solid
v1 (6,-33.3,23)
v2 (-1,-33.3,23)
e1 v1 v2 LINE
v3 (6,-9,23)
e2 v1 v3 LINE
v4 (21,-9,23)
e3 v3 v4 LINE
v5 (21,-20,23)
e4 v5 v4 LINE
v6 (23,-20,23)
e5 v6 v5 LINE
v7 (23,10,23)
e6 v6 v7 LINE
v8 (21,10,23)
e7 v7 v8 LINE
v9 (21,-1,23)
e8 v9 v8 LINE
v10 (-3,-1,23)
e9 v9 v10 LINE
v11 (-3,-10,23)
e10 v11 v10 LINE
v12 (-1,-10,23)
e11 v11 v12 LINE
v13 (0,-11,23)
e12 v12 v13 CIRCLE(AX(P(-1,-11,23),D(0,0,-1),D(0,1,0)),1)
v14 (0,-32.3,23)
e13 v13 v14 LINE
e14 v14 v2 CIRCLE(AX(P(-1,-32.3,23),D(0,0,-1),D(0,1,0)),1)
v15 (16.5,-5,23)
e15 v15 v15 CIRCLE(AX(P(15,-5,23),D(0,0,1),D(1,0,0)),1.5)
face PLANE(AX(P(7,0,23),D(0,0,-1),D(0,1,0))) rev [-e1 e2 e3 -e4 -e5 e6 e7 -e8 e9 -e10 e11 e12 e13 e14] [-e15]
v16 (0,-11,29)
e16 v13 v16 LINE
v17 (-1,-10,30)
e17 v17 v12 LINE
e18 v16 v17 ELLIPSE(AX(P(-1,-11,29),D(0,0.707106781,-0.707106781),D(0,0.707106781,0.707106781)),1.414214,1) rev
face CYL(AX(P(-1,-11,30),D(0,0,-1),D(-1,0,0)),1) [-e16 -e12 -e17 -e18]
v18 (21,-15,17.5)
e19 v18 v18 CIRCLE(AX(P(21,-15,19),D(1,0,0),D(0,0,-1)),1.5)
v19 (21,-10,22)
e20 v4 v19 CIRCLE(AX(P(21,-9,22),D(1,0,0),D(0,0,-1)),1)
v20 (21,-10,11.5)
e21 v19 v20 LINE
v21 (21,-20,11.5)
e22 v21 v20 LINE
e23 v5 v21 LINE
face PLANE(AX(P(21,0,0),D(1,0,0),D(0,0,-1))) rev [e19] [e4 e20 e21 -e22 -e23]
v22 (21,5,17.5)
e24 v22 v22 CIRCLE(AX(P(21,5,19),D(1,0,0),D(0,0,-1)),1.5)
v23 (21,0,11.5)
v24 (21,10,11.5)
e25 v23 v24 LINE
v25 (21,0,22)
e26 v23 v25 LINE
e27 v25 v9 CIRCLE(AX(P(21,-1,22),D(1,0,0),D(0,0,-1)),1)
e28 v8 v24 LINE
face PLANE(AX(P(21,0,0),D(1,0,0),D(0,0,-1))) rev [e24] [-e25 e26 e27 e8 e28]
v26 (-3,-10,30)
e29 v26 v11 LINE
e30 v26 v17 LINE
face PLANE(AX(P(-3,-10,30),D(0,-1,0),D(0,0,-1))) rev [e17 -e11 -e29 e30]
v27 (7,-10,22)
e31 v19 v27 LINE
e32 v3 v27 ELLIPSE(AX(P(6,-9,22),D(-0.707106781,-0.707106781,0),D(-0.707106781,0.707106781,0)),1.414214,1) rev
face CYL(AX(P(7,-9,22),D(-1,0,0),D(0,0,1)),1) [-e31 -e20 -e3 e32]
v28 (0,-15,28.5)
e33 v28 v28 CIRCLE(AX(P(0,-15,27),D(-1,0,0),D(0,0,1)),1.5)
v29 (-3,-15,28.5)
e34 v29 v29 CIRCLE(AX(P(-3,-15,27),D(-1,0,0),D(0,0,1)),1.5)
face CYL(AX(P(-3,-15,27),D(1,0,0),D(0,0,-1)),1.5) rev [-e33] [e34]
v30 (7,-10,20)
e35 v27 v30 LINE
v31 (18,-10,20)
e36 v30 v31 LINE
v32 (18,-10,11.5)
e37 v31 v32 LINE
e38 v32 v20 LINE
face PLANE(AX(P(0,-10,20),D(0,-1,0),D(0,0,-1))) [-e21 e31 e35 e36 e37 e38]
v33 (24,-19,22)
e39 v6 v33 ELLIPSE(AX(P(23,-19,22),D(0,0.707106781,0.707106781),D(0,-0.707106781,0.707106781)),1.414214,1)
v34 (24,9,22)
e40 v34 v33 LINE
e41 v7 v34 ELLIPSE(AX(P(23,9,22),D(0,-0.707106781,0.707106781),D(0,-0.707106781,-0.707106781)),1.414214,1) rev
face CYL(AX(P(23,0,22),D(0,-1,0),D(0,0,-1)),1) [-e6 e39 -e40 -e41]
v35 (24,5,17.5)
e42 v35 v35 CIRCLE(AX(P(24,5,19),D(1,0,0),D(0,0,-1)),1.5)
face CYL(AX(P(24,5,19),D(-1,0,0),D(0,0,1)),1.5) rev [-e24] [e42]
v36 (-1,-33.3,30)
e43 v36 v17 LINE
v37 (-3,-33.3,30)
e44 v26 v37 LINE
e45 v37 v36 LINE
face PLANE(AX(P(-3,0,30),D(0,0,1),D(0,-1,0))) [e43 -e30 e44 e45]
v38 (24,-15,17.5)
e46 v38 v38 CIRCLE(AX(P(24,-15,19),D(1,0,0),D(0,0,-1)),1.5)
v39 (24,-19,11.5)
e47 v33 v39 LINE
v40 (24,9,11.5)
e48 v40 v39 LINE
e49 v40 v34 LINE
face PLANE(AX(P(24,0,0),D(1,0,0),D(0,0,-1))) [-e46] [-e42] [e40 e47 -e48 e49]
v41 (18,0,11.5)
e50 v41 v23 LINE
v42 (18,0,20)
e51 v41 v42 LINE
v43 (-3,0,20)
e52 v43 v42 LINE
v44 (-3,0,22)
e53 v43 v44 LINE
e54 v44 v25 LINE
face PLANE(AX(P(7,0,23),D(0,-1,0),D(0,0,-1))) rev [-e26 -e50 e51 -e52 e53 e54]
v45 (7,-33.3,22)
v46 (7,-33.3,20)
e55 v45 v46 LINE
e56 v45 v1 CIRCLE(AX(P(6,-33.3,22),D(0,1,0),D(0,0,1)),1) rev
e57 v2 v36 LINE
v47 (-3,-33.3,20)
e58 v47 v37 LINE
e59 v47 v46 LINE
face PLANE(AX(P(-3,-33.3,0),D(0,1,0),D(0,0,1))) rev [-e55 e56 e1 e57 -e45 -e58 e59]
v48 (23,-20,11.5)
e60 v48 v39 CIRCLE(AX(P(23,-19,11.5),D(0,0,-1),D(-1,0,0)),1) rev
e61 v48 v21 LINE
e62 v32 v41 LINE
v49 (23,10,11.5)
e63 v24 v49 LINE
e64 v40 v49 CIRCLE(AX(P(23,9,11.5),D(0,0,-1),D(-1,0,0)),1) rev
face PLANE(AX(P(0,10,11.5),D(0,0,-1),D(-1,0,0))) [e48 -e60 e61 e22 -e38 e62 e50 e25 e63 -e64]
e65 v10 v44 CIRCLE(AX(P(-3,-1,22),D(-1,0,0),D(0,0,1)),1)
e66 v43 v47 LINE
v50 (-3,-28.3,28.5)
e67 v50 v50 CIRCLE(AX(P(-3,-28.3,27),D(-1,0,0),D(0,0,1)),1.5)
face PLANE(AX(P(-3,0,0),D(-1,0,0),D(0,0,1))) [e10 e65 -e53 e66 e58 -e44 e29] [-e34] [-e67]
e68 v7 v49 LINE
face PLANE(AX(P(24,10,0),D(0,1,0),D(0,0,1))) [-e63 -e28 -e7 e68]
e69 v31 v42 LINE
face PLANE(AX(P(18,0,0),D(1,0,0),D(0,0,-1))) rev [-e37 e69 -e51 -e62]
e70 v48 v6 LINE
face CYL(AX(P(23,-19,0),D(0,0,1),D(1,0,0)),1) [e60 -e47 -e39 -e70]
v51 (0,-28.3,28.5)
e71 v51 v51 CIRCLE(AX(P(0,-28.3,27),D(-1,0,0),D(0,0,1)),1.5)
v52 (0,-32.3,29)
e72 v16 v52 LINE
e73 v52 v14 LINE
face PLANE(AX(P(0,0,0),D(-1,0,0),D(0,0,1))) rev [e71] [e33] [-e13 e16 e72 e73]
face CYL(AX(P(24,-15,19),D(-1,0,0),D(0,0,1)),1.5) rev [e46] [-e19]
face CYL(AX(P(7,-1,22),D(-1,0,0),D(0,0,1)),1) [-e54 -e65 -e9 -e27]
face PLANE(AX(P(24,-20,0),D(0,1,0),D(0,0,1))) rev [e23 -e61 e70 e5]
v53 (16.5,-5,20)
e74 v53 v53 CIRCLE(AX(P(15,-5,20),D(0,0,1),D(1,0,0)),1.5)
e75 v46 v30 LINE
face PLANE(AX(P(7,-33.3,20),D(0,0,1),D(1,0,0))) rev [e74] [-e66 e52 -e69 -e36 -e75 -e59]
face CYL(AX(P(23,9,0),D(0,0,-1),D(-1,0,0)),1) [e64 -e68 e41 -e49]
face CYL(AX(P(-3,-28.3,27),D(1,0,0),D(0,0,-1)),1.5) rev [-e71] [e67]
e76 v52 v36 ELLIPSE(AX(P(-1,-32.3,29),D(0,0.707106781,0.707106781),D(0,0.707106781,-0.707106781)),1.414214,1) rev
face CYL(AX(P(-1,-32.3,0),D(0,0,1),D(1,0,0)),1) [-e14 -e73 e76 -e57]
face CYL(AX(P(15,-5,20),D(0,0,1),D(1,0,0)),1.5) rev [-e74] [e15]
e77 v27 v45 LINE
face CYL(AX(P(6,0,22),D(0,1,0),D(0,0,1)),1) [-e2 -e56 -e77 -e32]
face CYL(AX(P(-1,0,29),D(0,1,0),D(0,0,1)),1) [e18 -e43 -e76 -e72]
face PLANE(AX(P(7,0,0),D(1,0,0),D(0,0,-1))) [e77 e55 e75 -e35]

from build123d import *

# Parameters (mm, degrees)
CROQUIS1_W              = 23
CROQUIS1_H              = 33.3
SALIENTE_EXTRUIR2_DEPTH = 7
CROQUIS3_W              = 4
CROQUIS3_H              = 19
CORTAR_EXTRUIR1_DEPTH   = 42.071766458
CROQUIS7_R              = 1.5
SALIENTE_EXTRUIR3_DEPTH = 3
CROQUIS8_W              = 18
CROQUIS8_H              = 10
CROQUIS8_R              = 1.5
SALIENTE_EXTRUIR5_DEPTH = 3
SALIENTE_EXTRUIR6_START = -1
CROQUIS9_W              = 18
CROQUIS9_H              = 10
CROQUIS9_R              = 1.5
SALIENTE_EXTRUIR6_DEPTH = 1
CROQUIS10_W             = 23
CROQUIS10_H             = 10
SALIENTE_EXTRUIR7_DEPTH = 3
CROQUIS11_W             = 19
CROQUIS11_H             = 38
CORTAR_EXTRUIR5_DEPTH   = 57.449003534
CROQUIS15_W             = 7
CROQUIS15_H             = 10
CORTAR_EXTRUIR8_DEPTH   = 58.475994989
CROQUIS16_W             = 7
CROQUIS16_H             = 16
CORTAR_EXTRUIR9_DEPTH   = 1
CROQUIS18_W             = 23
CROQUIS18_H             = 10
CROQUIS18_R             = 1.5
SALIENTE_EXTRUIR8_DEPTH = 3
REDONDEO1_R             = 1
CROQUIS19_W             = 2
CROQUIS19_H             = 11.5
CORTAR_EXTRUIR10_DEPTH  = 67.516839973
CROQUIS20_W             = 11.5
CROQUIS20_H             = 11
CORTAR_EXTRUIR11_DEPTH  = 60.929041374


with BuildPart() as part:
    # Croquis1 → Saliente-Extruir2 (new body)
    with BuildSketch(Plane(origin=(0, 0, 0), x_dir=(0, 0, -1), z_dir=(1, 0, 0))):
        with Locations((-11.5, -16.65)):
            Rectangle(CROQUIS1_W, CROQUIS1_H)
    extrude(amount=SALIENTE_EXTRUIR2_DEPTH)

    # Croquis3 → Cortar-Extruir1 (cut, through all)
    with BuildSketch(Plane(origin=(0, 0, 0), x_dir=(1, 0, 0), z_dir=(0, 1, 0))):
        with Locations((5, -10.5)):
            Rectangle(CROQUIS3_W, CROQUIS3_H)
    extrude(amount=-CORTAR_EXTRUIR1_DEPTH, mode=Mode.SUBTRACT)



with BuildPart() as body_2:
    # Croquis7 → Saliente-Extruir3 (new body)
    with BuildSketch(Plane.ZY):
        Polygon((-7, 0), (-7, -33.3), (0, -33.3), (0, -44.3), (23, -44.3), (23, -33.3), (30, -33.3), (30, 0), align=None)
        with Locations((-4, -28.3)):
            Circle(CROQUIS7_R, mode=Mode.SUBTRACT)
        with Locations((-4, -15)):
            Circle(CROQUIS7_R, mode=Mode.SUBTRACT)
        with Locations((27, -15)):
            Circle(CROQUIS7_R, mode=Mode.SUBTRACT)
        with Locations((27, -28.3)):
            Circle(CROQUIS7_R, mode=Mode.SUBTRACT)
        with Locations((19, -40.3)):
            Circle(CROQUIS7_R, mode=Mode.SUBTRACT)
        with Locations((4, -40.3)):
            Circle(CROQUIS7_R, mode=Mode.SUBTRACT)
    extrude(amount=SALIENTE_EXTRUIR3_DEPTH)


with BuildPart() as part_1:
    add(part.part)

    add(body_2.part)  # Saliente-Extruir5 merges body 2
    # Croquis8 → Saliente-Extruir5 (add)
    with BuildSketch(Plane.XY.offset(23)):
        with Locations((9, -5)):
            Rectangle(CROQUIS8_W, CROQUIS8_H)
        with Locations((15, -5)):
            Circle(CROQUIS8_R, mode=Mode.SUBTRACT)
        with Locations((3, -5)):
            Circle(CROQUIS8_R, mode=Mode.SUBTRACT)
    extrude(amount=-SALIENTE_EXTRUIR5_DEPTH)

    # Croquis9 → Saliente-Extruir6 (add)
    with BuildSketch(Plane(origin=(0, 0, 0), x_dir=(-1, 0, 0), z_dir=(0, 0, -1)).offset(SALIENTE_EXTRUIR6_START)):
        with Locations((-9, -5)):
            Rectangle(CROQUIS9_W, CROQUIS9_H)
        with Locations(Location((-15, -5, 0), (0, 0, 180))):
            Circle(CROQUIS9_R, mode=Mode.SUBTRACT)
    extrude(amount=SALIENTE_EXTRUIR6_DEPTH)

    # Croquis10 → Saliente-Extruir7 (add)
    with BuildSketch(Plane(origin=(18, 0, 0), x_dir=(0, 0, -1), z_dir=(1, 0, 0))):
        with Locations((-11.5, -5)):
            Rectangle(CROQUIS10_W, CROQUIS10_H)
    extrude(amount=SALIENTE_EXTRUIR7_DEPTH)

    # Croquis11 → Cortar-Extruir5 (cut, through all)
    with BuildSketch(Plane(origin=(3, 0, 0), x_dir=(0, 0, -1), z_dir=(1, 0, 0))):
        with Locations((-10.5, -19)):
            Rectangle(CROQUIS11_W, CROQUIS11_H)
    extrude(amount=-CORTAR_EXTRUIR5_DEPTH, mode=Mode.SUBTRACT)

    # Croquis15 → Cortar-Extruir8 (cut, through all)
    with BuildSketch(Plane(origin=(0, 0, 0), x_dir=(0, 0, -1), z_dir=(1, 0, 0))):
        with Locations((-26.5, -5)):
            Rectangle(CROQUIS15_W, CROQUIS15_H)
        with Locations((3.5, -5)):
            Rectangle(CROQUIS15_W, CROQUIS15_H)
    extrude(amount=-CORTAR_EXTRUIR8_DEPTH, mode=Mode.SUBTRACT)

    # Croquis16 → Cortar-Extruir9 (cut)
    with BuildSketch(Plane(origin=(0, 0, 0), x_dir=(-1, 0, 0), z_dir=(0, 0, -1))):
        with Locations((-3.5, -25.3)):
            Rectangle(CROQUIS16_W, CROQUIS16_H)
    extrude(amount=-CORTAR_EXTRUIR9_DEPTH, mode=Mode.SUBTRACT)

    # Croquis18 → Saliente-Extruir8 (add)
    # profile 1 of 3: a face of its own
    with BuildSketch(Plane(origin=(21, 0, 0), x_dir=(0, 0, -1), z_dir=(1, 0, 0))):
        with Locations((-11.5, 5)):
            Rectangle(CROQUIS18_W, CROQUIS18_H)
        with Locations((-19, 5)):
            Circle(CROQUIS18_R, mode=Mode.SUBTRACT)
        with Locations((-4, 5)):
            Circle(CROQUIS18_R, mode=Mode.SUBTRACT)
    # profile 2 of 3: a face of its own
    with BuildSketch(Plane(origin=(21, 0, 0), x_dir=(0, 0, -1), z_dir=(1, 0, 0))):
        with Locations((-11.5, -5)):
            Rectangle(CROQUIS18_W, CROQUIS18_H)
    # profile 3 of 3: a face of its own
    with BuildSketch(Plane(origin=(21, 0, 0), x_dir=(0, 0, -1), z_dir=(1, 0, 0))):
        with Locations((-11.5, -15)):
            Rectangle(CROQUIS18_W, CROQUIS18_H)
        with Locations((-4, -15)):
            Circle(CROQUIS18_R, mode=Mode.SUBTRACT)
        with Locations((-19, -15)):
            Circle(CROQUIS18_R, mode=Mode.SUBTRACT)
    extrude(amount=SALIENTE_EXTRUIR8_DEPTH)

    # Redondeo1
    # the kernel refuses this fillet: 1 mm, written as the material it takes off along each edge
    with BuildSketch(Plane(origin=(0, -33.3, 30), x_dir=(-1, 0, 0), z_dir=(0, 1, 0)), Plane(origin=(7, -33.3, 23), x_dir=(-1, 0, 0), z_dir=(0, 1, 0))) as redondeo1_piece_1:
        with BuildLine():
            CenterArc((REDONDEO1_R, -REDONDEO1_R), REDONDEO1_R, 90, 90)
            Line((0, -REDONDEO1_R), (-REDONDEO1_R * 0.02, -REDONDEO1_R))
            Line((-REDONDEO1_R * 0.02, -REDONDEO1_R), (-REDONDEO1_R * 0.02, REDONDEO1_R * 0.02))
            Line((-REDONDEO1_R * 0.02, REDONDEO1_R * 0.02), (REDONDEO1_R, REDONDEO1_R * 0.02))
            Line((REDONDEO1_R, REDONDEO1_R * 0.02), (REDONDEO1_R, 0))
        make_face()
    extrude(amount=23.3, mode=Mode.SUBTRACT)
    with BuildSketch(Plane(origin=(0, -10, 23), x_dir=(-1, 0, 0), z_dir=(0, 0, 1)), Plane(origin=(0, -10, -7), x_dir=(-1, 0, 0), z_dir=(0, 0, 1)), Plane(origin=(0, -33.3, -7), x_dir=(0, 1, 0), z_dir=(0, 0, 1))) as redondeo1_piece_2:
        with BuildLine():
            CenterArc((REDONDEO1_R, REDONDEO1_R), REDONDEO1_R, 180, 90)
            Line((0, REDONDEO1_R), (-REDONDEO1_R * 0.02, REDONDEO1_R))
            Line((-REDONDEO1_R * 0.02, REDONDEO1_R), (-REDONDEO1_R * 0.02, -REDONDEO1_R * 0.02))
            Line((-REDONDEO1_R * 0.02, -REDONDEO1_R * 0.02), (REDONDEO1_R, -REDONDEO1_R * 0.02))
            Line((REDONDEO1_R, -REDONDEO1_R * 0.02), (REDONDEO1_R, 0))
        make_face()
    extrude(amount=7, mode=Mode.SUBTRACT)
    with BuildSketch(Plane(origin=(24, 10, 23), x_dir=(0, 0, -1), z_dir=(0, -1, 0)), Plane(origin=(24, 10, 0), x_dir=(-1, 0, 0), z_dir=(0, -1, 0))) as redondeo1_piece_3:
        with BuildLine():
            CenterArc((REDONDEO1_R, -REDONDEO1_R), REDONDEO1_R, 90, 90)
            Line((0, -REDONDEO1_R), (-REDONDEO1_R * 0.02, -REDONDEO1_R))
            Line((-REDONDEO1_R * 0.02, -REDONDEO1_R), (-REDONDEO1_R * 0.02, REDONDEO1_R * 0.02))
            Line((-REDONDEO1_R * 0.02, REDONDEO1_R * 0.02), (REDONDEO1_R, REDONDEO1_R * 0.02))
            Line((REDONDEO1_R, REDONDEO1_R * 0.02), (REDONDEO1_R, 0))
        make_face()
    extrude(amount=30, mode=Mode.SUBTRACT)
    with BuildSketch(Plane(origin=(24, 10, 0), x_dir=(-1, 0, 0), z_dir=(0, 0, 1)), Plane(origin=(0, -44.3, 0), x_dir=(0, 1, 0), z_dir=(0, 0, 1))) as redondeo1_piece_4:
        with BuildLine():
            CenterArc((REDONDEO1_R, REDONDEO1_R), REDONDEO1_R, 180, 90)
            Line((0, REDONDEO1_R), (-REDONDEO1_R * 0.02, REDONDEO1_R))
            Line((-REDONDEO1_R * 0.02, REDONDEO1_R), (-REDONDEO1_R * 0.02, -REDONDEO1_R * 0.02))
            Line((-REDONDEO1_R * 0.02, -REDONDEO1_R * 0.02), (REDONDEO1_R, -REDONDEO1_R * 0.02))
            Line((REDONDEO1_R, -REDONDEO1_R * 0.02), (REDONDEO1_R, 0))
        make_face()
    extrude(amount=23, mode=Mode.SUBTRACT)
    with BuildSketch(Plane(origin=(24, -20, 0), x_dir=(-1, 0, 0), z_dir=(0, 0, 1))) as redondeo1_piece_5:
        with BuildLine():
            CenterArc((REDONDEO1_R, -REDONDEO1_R), REDONDEO1_R, 90, 90)
            Line((0, -REDONDEO1_R), (-REDONDEO1_R * 0.02, -REDONDEO1_R))
            Line((-REDONDEO1_R * 0.02, -REDONDEO1_R), (-REDONDEO1_R * 0.02, REDONDEO1_R * 0.02))
            Line((-REDONDEO1_R * 0.02, REDONDEO1_R * 0.02), (REDONDEO1_R, REDONDEO1_R * 0.02))
            Line((REDONDEO1_R, REDONDEO1_R * 0.02), (REDONDEO1_R, 0))
        make_face()
    extrude(amount=23, mode=Mode.SUBTRACT)
    with BuildSketch(Plane(origin=(7, -10, 23), x_dir=(0, 1, 0), z_dir=(1, 0, 0))) as redondeo1_piece_6:
        with BuildLine():
            CenterArc((REDONDEO1_R, -REDONDEO1_R), REDONDEO1_R, 90, 90)
            Line((0, -REDONDEO1_R), (-REDONDEO1_R * 0.02, -REDONDEO1_R))
            Line((-REDONDEO1_R * 0.02, -REDONDEO1_R), (-REDONDEO1_R * 0.02, REDONDEO1_R * 0.02))
            Line((-REDONDEO1_R * 0.02, REDONDEO1_R * 0.02), (REDONDEO1_R, REDONDEO1_R * 0.02))
            Line((REDONDEO1_R, REDONDEO1_R * 0.02), (REDONDEO1_R, 0))
        make_face()
    extrude(amount=14, mode=Mode.SUBTRACT)
    with BuildSketch(Plane(origin=(0, -33.3, 0), x_dir=(0, 0, 1), z_dir=(0, -1, 0))) as redondeo1_piece_7:
        with BuildLine():
            CenterArc((REDONDEO1_R, REDONDEO1_R), REDONDEO1_R, 180, 90)
            Line((0, REDONDEO1_R), (-REDONDEO1_R * 0.02, REDONDEO1_R))
            Line((-REDONDEO1_R * 0.02, REDONDEO1_R), (-REDONDEO1_R * 0.02, -REDONDEO1_R * 0.02))
            Line((-REDONDEO1_R * 0.02, -REDONDEO1_R * 0.02), (REDONDEO1_R, -REDONDEO1_R * 0.02))
            Line((REDONDEO1_R, -REDONDEO1_R * 0.02), (REDONDEO1_R, 0))
        make_face()
    extrude(amount=11, mode=Mode.SUBTRACT)
    with BuildSketch(Plane(origin=(0, -33.3, 23), x_dir=(-1, 0, 0), z_dir=(0, 0, 1))) as redondeo1_piece_8:
        with BuildLine():
            CenterArc((REDONDEO1_R, -REDONDEO1_R), REDONDEO1_R, 90, 90)
            Line((0, -REDONDEO1_R), (-REDONDEO1_R * 0.02, -REDONDEO1_R))
            Line((-REDONDEO1_R * 0.02, -REDONDEO1_R), (-REDONDEO1_R * 0.02, REDONDEO1_R * 0.02))
            Line((-REDONDEO1_R * 0.02, REDONDEO1_R * 0.02), (REDONDEO1_R, REDONDEO1_R * 0.02))
            Line((REDONDEO1_R, REDONDEO1_R * 0.02), (REDONDEO1_R, 0))
        make_face()
    extrude(amount=7, mode=Mode.SUBTRACT)
    with BuildSketch(Plane(origin=(-3, 0, 23), x_dir=(0, -1, 0), z_dir=(1, 0, 0)), Plane(origin=(21, 0, 0), x_dir=(0, -1, 0), z_dir=(-1, 0, 0))) as redondeo1_piece_9:
        with BuildLine():
            CenterArc((REDONDEO1_R, REDONDEO1_R), REDONDEO1_R, 180, 90)
            Line((0, REDONDEO1_R), (-REDONDEO1_R * 0.02, REDONDEO1_R))
            Line((-REDONDEO1_R * 0.02, REDONDEO1_R), (-REDONDEO1_R * 0.02, -REDONDEO1_R * 0.02))
            Line((-REDONDEO1_R * 0.02, -REDONDEO1_R * 0.02), (REDONDEO1_R, -REDONDEO1_R * 0.02))
            Line((REDONDEO1_R, -REDONDEO1_R * 0.02), (REDONDEO1_R, 0))
        make_face()
    extrude(amount=24, mode=Mode.SUBTRACT)
    with BuildSketch(Plane(origin=(0, -10, -7), x_dir=(0, 0, 1), z_dir=(0, -1, 0))) as redondeo1_piece_10:
        with BuildLine():
            CenterArc((REDONDEO1_R, REDONDEO1_R), REDONDEO1_R, 180, 90)
            Line((0, REDONDEO1_R), (-REDONDEO1_R * 0.02, REDONDEO1_R))
            Line((-REDONDEO1_R * 0.02, REDONDEO1_R), (-REDONDEO1_R * 0.02, -REDONDEO1_R * 0.02))
            Line((-REDONDEO1_R * 0.02, -REDONDEO1_R * 0.02), (REDONDEO1_R, -REDONDEO1_R * 0.02))
            Line((REDONDEO1_R, -REDONDEO1_R * 0.02), (REDONDEO1_R, 0))
        make_face()
    extrude(amount=23.3, mode=Mode.SUBTRACT)
    with BuildSketch(Plane(origin=(0, -33.3, 23), x_dir=(-1, 0, 0), z_dir=(0, 0, 1))) as redondeo1_piece_11a_section:
        with BuildLine():
            CenterArc((REDONDEO1_R, -REDONDEO1_R), REDONDEO1_R, 90, 90)
            Line((0, -REDONDEO1_R), (-REDONDEO1_R * 0.02, -REDONDEO1_R))
            Line((-REDONDEO1_R * 0.02, -REDONDEO1_R), (-REDONDEO1_R * 0.02, REDONDEO1_R * 0.02))
            Line((-REDONDEO1_R * 0.02, REDONDEO1_R * 0.02), (REDONDEO1_R, REDONDEO1_R * 0.02))
            Line((REDONDEO1_R, REDONDEO1_R * 0.02), (REDONDEO1_R, 0))
        make_face()
    redondeo1_piece_11a = extrude(amount=9.5, mode=Mode.PRIVATE)
    redondeo1_piece_11a = split(redondeo1_piece_11a, bisect_by=Plane(origin=(-0.226395114, -33.073604886, 30), z_dir=(0, 0, 1)), keep=Keep.TOP, mode=Mode.PRIVATE)
    with BuildSketch(Plane(origin=(0, -35.8, 30), x_dir=(-1, 0, 0), z_dir=(0, 1, 0))) as redondeo1_piece_11b_section:
        with BuildLine():
            CenterArc((REDONDEO1_R, -REDONDEO1_R), REDONDEO1_R, 90, 90)
            Line((0, -REDONDEO1_R), (-REDONDEO1_R * 0.02, -REDONDEO1_R))
            Line((-REDONDEO1_R * 0.02, -REDONDEO1_R), (-REDONDEO1_R * 0.02, REDONDEO1_R * 0.02))
            Line((-REDONDEO1_R * 0.02, REDONDEO1_R * 0.02), (REDONDEO1_R, REDONDEO1_R * 0.02))
            Line((REDONDEO1_R, REDONDEO1_R * 0.02), (REDONDEO1_R, 0))
        make_face()
    redondeo1_piece_11b = extrude(amount=25.8, mode=Mode.PRIVATE)
    redondeo1_piece_11b = split(redondeo1_piece_11b, bisect_by=Plane(origin=(-0.226395114, -33.3, 29.773604886), z_dir=(0, -1, 0)), keep=Keep.TOP, mode=Mode.PRIVATE)
    redondeo1_piece_11 = redondeo1_piece_11a & redondeo1_piece_11b
    add(redondeo1_piece_11, mode=Mode.SUBTRACT)
    with BuildSketch(Plane(origin=(0, -10, 23), x_dir=(-1, 0, 0), z_dir=(0, 0, 1))) as redondeo1_piece_12a_section:
        with BuildLine():
            CenterArc((REDONDEO1_R, REDONDEO1_R), REDONDEO1_R, 180, 90)
            Line((0, REDONDEO1_R), (-REDONDEO1_R * 0.02, REDONDEO1_R))
            Line((-REDONDEO1_R * 0.02, REDONDEO1_R), (-REDONDEO1_R * 0.02, -REDONDEO1_R * 0.02))
            Line((-REDONDEO1_R * 0.02, -REDONDEO1_R * 0.02), (REDONDEO1_R, -REDONDEO1_R * 0.02))
            Line((REDONDEO1_R, -REDONDEO1_R * 0.02), (REDONDEO1_R, 0))
        make_face()
    redondeo1_piece_12a = extrude(amount=9.5, mode=Mode.PRIVATE)
    redondeo1_piece_12a = split(redondeo1_piece_12a, bisect_by=Plane(origin=(-0.226395114, -10.226395114, 30), z_dir=(0, 0, 1)), keep=Keep.TOP, mode=Mode.PRIVATE)
    with BuildSketch(Plane(origin=(0, -33.3, 30), x_dir=(-1, 0, 0), z_dir=(0, 1, 0))) as redondeo1_piece_12b_section:
        with BuildLine():
            CenterArc((REDONDEO1_R, -REDONDEO1_R), REDONDEO1_R, 90, 90)
            Line((0, -REDONDEO1_R), (-REDONDEO1_R * 0.02, -REDONDEO1_R))
            Line((-REDONDEO1_R * 0.02, -REDONDEO1_R), (-REDONDEO1_R * 0.02, REDONDEO1_R * 0.02))
            Line((-REDONDEO1_R * 0.02, REDONDEO1_R * 0.02), (REDONDEO1_R, REDONDEO1_R * 0.02))
            Line((REDONDEO1_R, REDONDEO1_R * 0.02), (REDONDEO1_R, 0))
        make_face()
    redondeo1_piece_12b = extrude(amount=25.8, mode=Mode.PRIVATE)
    redondeo1_piece_12b = split(redondeo1_piece_12b, bisect_by=Plane(origin=(-0.226395114, -10, 29.773604886), z_dir=(0, 1, 0)), keep=Keep.TOP, mode=Mode.PRIVATE)
    redondeo1_piece_12 = redondeo1_piece_12a & redondeo1_piece_12b
    add(redondeo1_piece_12, mode=Mode.SUBTRACT)
    with BuildSketch(Plane(origin=(24, 10, 0), x_dir=(-1, 0, 0), z_dir=(0, 0, 1))) as redondeo1_piece_13a_section:
        with BuildLine():
            CenterArc((REDONDEO1_R, REDONDEO1_R), REDONDEO1_R, 180, 90)
            Line((0, REDONDEO1_R), (-REDONDEO1_R * 0.02, REDONDEO1_R))
            Line((-REDONDEO1_R * 0.02, REDONDEO1_R), (-REDONDEO1_R * 0.02, -REDONDEO1_R * 0.02))
            Line((-REDONDEO1_R * 0.02, -REDONDEO1_R * 0.02), (REDONDEO1_R, -REDONDEO1_R * 0.02))
            Line((REDONDEO1_R, -REDONDEO1_R * 0.02), (REDONDEO1_R, 0))
        make_face()
    redondeo1_piece_13a = extrude(amount=25.5, mode=Mode.PRIVATE)
    redondeo1_piece_13a = split(redondeo1_piece_13a, bisect_by=Plane(origin=(23.773604886, 9.773604886, 23), z_dir=(0, 0, 1)), keep=Keep.TOP, mode=Mode.PRIVATE)
    with BuildSketch(Plane(origin=(24, 12.5, 23), x_dir=(0, 0, -1), z_dir=(0, -1, 0))) as redondeo1_piece_13b_section:
        with BuildLine():
            CenterArc((REDONDEO1_R, -REDONDEO1_R), REDONDEO1_R, 90, 90)
            Line((0, -REDONDEO1_R), (-REDONDEO1_R * 0.02, -REDONDEO1_R))
            Line((-REDONDEO1_R * 0.02, -REDONDEO1_R), (-REDONDEO1_R * 0.02, REDONDEO1_R * 0.02))
            Line((-REDONDEO1_R * 0.02, REDONDEO1_R * 0.02), (REDONDEO1_R, REDONDEO1_R * 0.02))
            Line((REDONDEO1_R, REDONDEO1_R * 0.02), (REDONDEO1_R, 0))
        make_face()
    redondeo1_piece_13b = extrude(amount=32.5, mode=Mode.PRIVATE)
    redondeo1_piece_13b = split(redondeo1_piece_13b, bisect_by=Plane(origin=(23.773604886, 10, 22.773604886), z_dir=(0, 1, 0)), keep=Keep.TOP, mode=Mode.PRIVATE)
    redondeo1_piece_13 = redondeo1_piece_13a & redondeo1_piece_13b
    add(redondeo1_piece_13, mode=Mode.SUBTRACT)
    with BuildSketch(Plane(origin=(24, -20, 0), x_dir=(-1, 0, 0), z_dir=(0, 0, 1))) as redondeo1_piece_14a_section:
        with BuildLine():
            CenterArc((REDONDEO1_R, -REDONDEO1_R), REDONDEO1_R, 90, 90)
            Line((0, -REDONDEO1_R), (-REDONDEO1_R * 0.02, -REDONDEO1_R))
            Line((-REDONDEO1_R * 0.02, -REDONDEO1_R), (-REDONDEO1_R * 0.02, REDONDEO1_R * 0.02))
            Line((-REDONDEO1_R * 0.02, REDONDEO1_R * 0.02), (REDONDEO1_R, REDONDEO1_R * 0.02))
            Line((REDONDEO1_R, REDONDEO1_R * 0.02), (REDONDEO1_R, 0))
        make_face()
    redondeo1_piece_14a = extrude(amount=25.5, mode=Mode.PRIVATE)
    redondeo1_piece_14a = split(redondeo1_piece_14a, bisect_by=Plane(origin=(23.773604886, -19.773604886, 23), z_dir=(0, 0, 1)), keep=Keep.TOP, mode=Mode.PRIVATE)
    with BuildSketch(Plane(origin=(24, 10, 23), x_dir=(0, 0, -1), z_dir=(0, -1, 0))) as redondeo1_piece_14b_section:
        with BuildLine():
            CenterArc((REDONDEO1_R, -REDONDEO1_R), REDONDEO1_R, 90, 90)
            Line((0, -REDONDEO1_R), (-REDONDEO1_R * 0.02, -REDONDEO1_R))
            Line((-REDONDEO1_R * 0.02, -REDONDEO1_R), (-REDONDEO1_R * 0.02, REDONDEO1_R * 0.02))
            Line((-REDONDEO1_R * 0.02, REDONDEO1_R * 0.02), (REDONDEO1_R, REDONDEO1_R * 0.02))
            Line((REDONDEO1_R, REDONDEO1_R * 0.02), (REDONDEO1_R, 0))
        make_face()
    redondeo1_piece_14b = extrude(amount=32.5, mode=Mode.PRIVATE)
    redondeo1_piece_14b = split(redondeo1_piece_14b, bisect_by=Plane(origin=(23.773604886, -20, 22.773604886), z_dir=(0, -1, 0)), keep=Keep.TOP, mode=Mode.PRIVATE)
    redondeo1_piece_14 = redondeo1_piece_14a & redondeo1_piece_14b
    add(redondeo1_piece_14, mode=Mode.SUBTRACT)
    with BuildSketch(Plane(origin=(24, 12.5, 0), x_dir=(-1, 0, 0), z_dir=(0, -1, 0))) as redondeo1_piece_15a_section:
        with BuildLine():
            CenterArc((REDONDEO1_R, -REDONDEO1_R), REDONDEO1_R, 90, 90)
            Line((0, -REDONDEO1_R), (-REDONDEO1_R * 0.02, -REDONDEO1_R))
            Line((-REDONDEO1_R * 0.02, -REDONDEO1_R), (-REDONDEO1_R * 0.02, REDONDEO1_R * 0.02))
            Line((-REDONDEO1_R * 0.02, REDONDEO1_R * 0.02), (REDONDEO1_R, REDONDEO1_R * 0.02))
            Line((REDONDEO1_R, REDONDEO1_R * 0.02), (REDONDEO1_R, 0))
        make_face()
    redondeo1_piece_15a = extrude(amount=32.5, mode=Mode.PRIVATE)
    redondeo1_piece_15a = split(redondeo1_piece_15a, bisect_by=Plane(origin=(23.773604886, 10, 0.226395114), z_dir=(0, 1, 0)), keep=Keep.TOP, mode=Mode.PRIVATE)
    with BuildSketch(Plane(origin=(24, 10, -2.5), x_dir=(-1, 0, 0), z_dir=(0, 0, 1))) as redondeo1_piece_15b_section:
        with BuildLine():
            CenterArc((REDONDEO1_R, REDONDEO1_R), REDONDEO1_R, 180, 90)
            Line((0, REDONDEO1_R), (-REDONDEO1_R * 0.02, REDONDEO1_R))
            Line((-REDONDEO1_R * 0.02, REDONDEO1_R), (-REDONDEO1_R * 0.02, -REDONDEO1_R * 0.02))
            Line((-REDONDEO1_R * 0.02, -REDONDEO1_R * 0.02), (REDONDEO1_R, -REDONDEO1_R * 0.02))
            Line((REDONDEO1_R, -REDONDEO1_R * 0.02), (REDONDEO1_R, 0))
        make_face()
    redondeo1_piece_15b = extrude(amount=25.5, mode=Mode.PRIVATE)
    redondeo1_piece_15b = split(redondeo1_piece_15b, bisect_by=Plane(origin=(23.773604886, 9.773604886, 0), z_dir=(0, 0, -1)), keep=Keep.TOP, mode=Mode.PRIVATE)
    redondeo1_piece_15 = redondeo1_piece_15a & redondeo1_piece_15b
    add(redondeo1_piece_15, mode=Mode.SUBTRACT)
    with BuildSketch(Plane(origin=(24, 10, 0), x_dir=(-1, 0, 0), z_dir=(0, -1, 0))) as redondeo1_piece_16a_section:
        with BuildLine():
            CenterArc((REDONDEO1_R, -REDONDEO1_R), REDONDEO1_R, 90, 90)
            Line((0, -REDONDEO1_R), (-REDONDEO1_R * 0.02, -REDONDEO1_R))
            Line((-REDONDEO1_R * 0.02, -REDONDEO1_R), (-REDONDEO1_R * 0.02, REDONDEO1_R * 0.02))
            Line((-REDONDEO1_R * 0.02, REDONDEO1_R * 0.02), (REDONDEO1_R, REDONDEO1_R * 0.02))
            Line((REDONDEO1_R, REDONDEO1_R * 0.02), (REDONDEO1_R, 0))
        make_face()
    redondeo1_piece_16a = extrude(amount=32.5, mode=Mode.PRIVATE)
    redondeo1_piece_16a = split(redondeo1_piece_16a, bisect_by=Plane(origin=(23.773604886, -20, 0.226395114), z_dir=(0, -1, 0)), keep=Keep.TOP, mode=Mode.PRIVATE)
    with BuildSketch(Plane(origin=(24, -20, -2.5), x_dir=(-1, 0, 0), z_dir=(0, 0, 1))) as redondeo1_piece_16b_section:
        with BuildLine():
            CenterArc((REDONDEO1_R, -REDONDEO1_R), REDONDEO1_R, 90, 90)
            Line((0, -REDONDEO1_R), (-REDONDEO1_R * 0.02, -REDONDEO1_R))
            Line((-REDONDEO1_R * 0.02, -REDONDEO1_R), (-REDONDEO1_R * 0.02, REDONDEO1_R * 0.02))
            Line((-REDONDEO1_R * 0.02, REDONDEO1_R * 0.02), (REDONDEO1_R, REDONDEO1_R * 0.02))
            Line((REDONDEO1_R, REDONDEO1_R * 0.02), (REDONDEO1_R, 0))
        make_face()
    redondeo1_piece_16b = extrude(amount=25.5, mode=Mode.PRIVATE)
    redondeo1_piece_16b = split(redondeo1_piece_16b, bisect_by=Plane(origin=(23.773604886, -19.773604886, 0), z_dir=(0, 0, -1)), keep=Keep.TOP, mode=Mode.PRIVATE)
    redondeo1_piece_16 = redondeo1_piece_16a & redondeo1_piece_16b
    add(redondeo1_piece_16, mode=Mode.SUBTRACT)
    with BuildSketch(Plane(origin=(4.5, -10, 23), x_dir=(0, 1, 0), z_dir=(1, 0, 0))) as redondeo1_piece_17a_section:
        with BuildLine():
            CenterArc((REDONDEO1_R, -REDONDEO1_R), REDONDEO1_R, 90, 90)
            Line((0, -REDONDEO1_R), (-REDONDEO1_R * 0.02, -REDONDEO1_R))
            Line((-REDONDEO1_R * 0.02, -REDONDEO1_R), (-REDONDEO1_R * 0.02, REDONDEO1_R * 0.02))
            Line((-REDONDEO1_R * 0.02, REDONDEO1_R * 0.02), (REDONDEO1_R, REDONDEO1_R * 0.02))
            Line((REDONDEO1_R, REDONDEO1_R * 0.02), (REDONDEO1_R, 0))
        make_face()
    redondeo1_piece_17a = extrude(amount=16.5, mode=Mode.PRIVATE)
    redondeo1_piece_17a = split(redondeo1_piece_17a, bisect_by=Plane(origin=(7, -9.773604886, 22.773604886), z_dir=(-1, 0, 0)), keep=Keep.TOP, mode=Mode.PRIVATE)
    with BuildSketch(Plane(origin=(7, -33.3, 23), x_dir=(-1, 0, 0), z_dir=(0, 1, 0))) as redondeo1_piece_17b_section:
        with BuildLine():
            CenterArc((REDONDEO1_R, -REDONDEO1_R), REDONDEO1_R, 90, 90)
            Line((0, -REDONDEO1_R), (-REDONDEO1_R * 0.02, -REDONDEO1_R))
            Line((-REDONDEO1_R * 0.02, -REDONDEO1_R), (-REDONDEO1_R * 0.02, REDONDEO1_R * 0.02))
            Line((-REDONDEO1_R * 0.02, REDONDEO1_R * 0.02), (REDONDEO1_R, REDONDEO1_R * 0.02))
            Line((REDONDEO1_R, REDONDEO1_R * 0.02), (REDONDEO1_R, 0))
        make_face()
    redondeo1_piece_17b = extrude(amount=25.8, mode=Mode.PRIVATE)
    redondeo1_piece_17b = split(redondeo1_piece_17b, bisect_by=Plane(origin=(6.773604886, -10, 22.773604886), z_dir=(0, 1, 0)), keep=Keep.TOP, mode=Mode.PRIVATE)
    redondeo1_piece_17 = redondeo1_piece_17a & redondeo1_piece_17b
    add(redondeo1_piece_17, mode=Mode.SUBTRACT)
    with BuildSketch(Plane(origin=(0, -33.3, -7), x_dir=(0, 1, 0), z_dir=(0, 0, 1))) as redondeo1_piece_18a_section:
        with BuildLine():
            CenterArc((REDONDEO1_R, REDONDEO1_R), REDONDEO1_R, 180, 90)
            Line((0, REDONDEO1_R), (-REDONDEO1_R * 0.02, REDONDEO1_R))
            Line((-REDONDEO1_R * 0.02, REDONDEO1_R), (-REDONDEO1_R * 0.02, -REDONDEO1_R * 0.02))
            Line((-REDONDEO1_R * 0.02, -REDONDEO1_R * 0.02), (REDONDEO1_R, -REDONDEO1_R * 0.02))
            Line((REDONDEO1_R, -REDONDEO1_R * 0.02), (REDONDEO1_R, 0))
        make_face()
    redondeo1_piece_18a = extrude(amount=9.5, mode=Mode.PRIVATE)
    redondeo1_piece_18a = split(redondeo1_piece_18a, bisect_by=Plane(origin=(-0.226395114, -33.073604886, 0), z_dir=(0, 0, 1)), keep=Keep.TOP, mode=Mode.PRIVATE)
    with BuildSketch(Plane(origin=(0, -30.8, 0), x_dir=(0, 0, 1), z_dir=(0, -1, 0))) as redondeo1_piece_18b_section:
        with BuildLine():
            CenterArc((REDONDEO1_R, REDONDEO1_R), REDONDEO1_R, 180, 90)
            Line((0, REDONDEO1_R), (-REDONDEO1_R * 0.02, REDONDEO1_R))
            Line((-REDONDEO1_R * 0.02, REDONDEO1_R), (-REDONDEO1_R * 0.02, -REDONDEO1_R * 0.02))
            Line((-REDONDEO1_R * 0.02, -REDONDEO1_R * 0.02), (REDONDEO1_R, -REDONDEO1_R * 0.02))
            Line((REDONDEO1_R, -REDONDEO1_R * 0.02), (REDONDEO1_R, 0))
        make_face()
    redondeo1_piece_18b = extrude(amount=13.5, mode=Mode.PRIVATE)
    redondeo1_piece_18b = split(redondeo1_piece_18b, bisect_by=Plane(origin=(-0.226395114, -33.3, 0.226395114), z_dir=(0, 1, 0)), keep=Keep.TOP, mode=Mode.PRIVATE)
    redondeo1_piece_18 = redondeo1_piece_18a & redondeo1_piece_18b
    add(redondeo1_piece_18, mode=Mode.SUBTRACT)
    with BuildSketch(Plane(origin=(0, -33.3, 0), x_dir=(0, 0, 1), z_dir=(0, -1, 0))) as redondeo1_piece_19a_section:
        with BuildLine():
            CenterArc((REDONDEO1_R, REDONDEO1_R), REDONDEO1_R, 180, 90)
            Line((0, REDONDEO1_R), (-REDONDEO1_R * 0.02, REDONDEO1_R))
            Line((-REDONDEO1_R * 0.02, REDONDEO1_R), (-REDONDEO1_R * 0.02, -REDONDEO1_R * 0.02))
            Line((-REDONDEO1_R * 0.02, -REDONDEO1_R * 0.02), (REDONDEO1_R, -REDONDEO1_R * 0.02))
            Line((REDONDEO1_R, -REDONDEO1_R * 0.02), (REDONDEO1_R, 0))
        make_face()
    redondeo1_piece_19a = extrude(amount=13.5, mode=Mode.PRIVATE)
    redondeo1_piece_19a = split(redondeo1_piece_19a, bisect_by=Plane(origin=(-0.226395114, -44.3, 0.226395114), z_dir=(0, -1, 0)), keep=Keep.TOP, mode=Mode.PRIVATE)
    with BuildSketch(Plane(origin=(0, -44.3, -2.5), x_dir=(0, 1, 0), z_dir=(0, 0, 1))) as redondeo1_piece_19b_section:
        with BuildLine():
            CenterArc((REDONDEO1_R, REDONDEO1_R), REDONDEO1_R, 180, 90)
            Line((0, REDONDEO1_R), (-REDONDEO1_R * 0.02, REDONDEO1_R))
            Line((-REDONDEO1_R * 0.02, REDONDEO1_R), (-REDONDEO1_R * 0.02, -REDONDEO1_R * 0.02))
            Line((-REDONDEO1_R * 0.02, -REDONDEO1_R * 0.02), (REDONDEO1_R, -REDONDEO1_R * 0.02))
            Line((REDONDEO1_R, -REDONDEO1_R * 0.02), (REDONDEO1_R, 0))
        make_face()
    redondeo1_piece_19b = extrude(amount=25.5, mode=Mode.PRIVATE)
    redondeo1_piece_19b = split(redondeo1_piece_19b, bisect_by=Plane(origin=(-0.226395114, -44.073604886, 0), z_dir=(0, 0, -1)), keep=Keep.TOP, mode=Mode.PRIVATE)
    redondeo1_piece_19 = redondeo1_piece_19a & redondeo1_piece_19b
    add(redondeo1_piece_19, mode=Mode.SUBTRACT)
    with BuildSketch(Plane(origin=(0, -10, -9.5), x_dir=(-1, 0, 0), z_dir=(0, 0, 1))) as redondeo1_piece_20a_section:
        with BuildLine():
            CenterArc((REDONDEO1_R, REDONDEO1_R), REDONDEO1_R, 180, 90)
            Line((0, REDONDEO1_R), (-REDONDEO1_R * 0.02, REDONDEO1_R))
            Line((-REDONDEO1_R * 0.02, REDONDEO1_R), (-REDONDEO1_R * 0.02, -REDONDEO1_R * 0.02))
            Line((-REDONDEO1_R * 0.02, -REDONDEO1_R * 0.02), (REDONDEO1_R, -REDONDEO1_R * 0.02))
            Line((REDONDEO1_R, -REDONDEO1_R * 0.02), (REDONDEO1_R, 0))
        make_face()
    redondeo1_piece_20a = extrude(amount=9.5, mode=Mode.PRIVATE)
    redondeo1_piece_20a = split(redondeo1_piece_20a, bisect_by=Plane(origin=(-0.226395114, -10.226395114, -7), z_dir=(0, 0, -1)), keep=Keep.TOP, mode=Mode.PRIVATE)
    with BuildSketch(Plane(origin=(0, -7.5, -7), x_dir=(0, 0, 1), z_dir=(0, -1, 0))) as redondeo1_piece_20b_section:
        with BuildLine():
            CenterArc((REDONDEO1_R, REDONDEO1_R), REDONDEO1_R, 180, 90)
            Line((0, REDONDEO1_R), (-REDONDEO1_R * 0.02, REDONDEO1_R))
            Line((-REDONDEO1_R * 0.02, REDONDEO1_R), (-REDONDEO1_R * 0.02, -REDONDEO1_R * 0.02))
            Line((-REDONDEO1_R * 0.02, -REDONDEO1_R * 0.02), (REDONDEO1_R, -REDONDEO1_R * 0.02))
            Line((REDONDEO1_R, -REDONDEO1_R * 0.02), (REDONDEO1_R, 0))
        make_face()
    redondeo1_piece_20b = extrude(amount=25.8, mode=Mode.PRIVATE)
    redondeo1_piece_20b = split(redondeo1_piece_20b, bisect_by=Plane(origin=(-0.226395114, -10, -6.773604886), z_dir=(0, 1, 0)), keep=Keep.TOP, mode=Mode.PRIVATE)
    redondeo1_piece_20 = redondeo1_piece_20a & redondeo1_piece_20b
    add(redondeo1_piece_20, mode=Mode.SUBTRACT)
    with BuildSketch(Plane(origin=(0, -10, -7), x_dir=(0, 0, 1), z_dir=(0, -1, 0))) as redondeo1_piece_21a_section:
        with BuildLine():
            CenterArc((REDONDEO1_R, REDONDEO1_R), REDONDEO1_R, 180, 90)
            Line((0, REDONDEO1_R), (-REDONDEO1_R * 0.02, REDONDEO1_R))
            Line((-REDONDEO1_R * 0.02, REDONDEO1_R), (-REDONDEO1_R * 0.02, -REDONDEO1_R * 0.02))
            Line((-REDONDEO1_R * 0.02, -REDONDEO1_R * 0.02), (REDONDEO1_R, -REDONDEO1_R * 0.02))
            Line((REDONDEO1_R, -REDONDEO1_R * 0.02), (REDONDEO1_R, 0))
        make_face()
    redondeo1_piece_21a = extrude(amount=25.8, mode=Mode.PRIVATE)
    redondeo1_piece_21a = split(redondeo1_piece_21a, bisect_by=Plane(origin=(-0.226395114, -33.3, -6.773604886), z_dir=(0, -1, 0)), keep=Keep.TOP, mode=Mode.PRIVATE)
    with BuildSketch(Plane(origin=(0, -33.3, -9.5), x_dir=(0, 1, 0), z_dir=(0, 0, 1))) as redondeo1_piece_21b_section:
        with BuildLine():
            CenterArc((REDONDEO1_R, REDONDEO1_R), REDONDEO1_R, 180, 90)
            Line((0, REDONDEO1_R), (-REDONDEO1_R * 0.02, REDONDEO1_R))
            Line((-REDONDEO1_R * 0.02, REDONDEO1_R), (-REDONDEO1_R * 0.02, -REDONDEO1_R * 0.02))
            Line((-REDONDEO1_R * 0.02, -REDONDEO1_R * 0.02), (REDONDEO1_R, -REDONDEO1_R * 0.02))
            Line((REDONDEO1_R, -REDONDEO1_R * 0.02), (REDONDEO1_R, 0))
        make_face()
    redondeo1_piece_21b = extrude(amount=9.5, mode=Mode.PRIVATE)
    redondeo1_piece_21b = split(redondeo1_piece_21b, bisect_by=Plane(origin=(-0.226395114, -33.073604886, -7), z_dir=(0, 0, -1)), keep=Keep.TOP, mode=Mode.PRIVATE)
    redondeo1_piece_21 = redondeo1_piece_21a & redondeo1_piece_21b
    add(redondeo1_piece_21, mode=Mode.SUBTRACT)

    # Croquis19 → Cortar-Extruir10 (cut, through all)
    with BuildSketch(Plane(origin=(0, -44.3, 0), x_dir=(-1, 0, 0), z_dir=(0, -1, 0))):
        Polygon((-24, -11.5), (1, -11.5), (1, 0), (3, 0), (3, 7), (-24, 7), align=None)
        with Locations((2, -5.75)):
            Rectangle(CROQUIS19_W, CROQUIS19_H)
    extrude(amount=-CORTAR_EXTRUIR10_DEPTH, mode=Mode.SUBTRACT)

    # Croquis20 → Cortar-Extruir11 (cut, through all)
    with BuildSketch(Plane(origin=(24, 0, 0), x_dir=(0, 0, -1), z_dir=(1, 0, 0))):
        with Locations((-17.25, -38.8)):
            Rectangle(CROQUIS20_W, CROQUIS20_H)
    extrude(amount=-CORTAR_EXTRUIR11_DEPTH, mode=Mode.SUBTRACT)


solid = part_1.part
